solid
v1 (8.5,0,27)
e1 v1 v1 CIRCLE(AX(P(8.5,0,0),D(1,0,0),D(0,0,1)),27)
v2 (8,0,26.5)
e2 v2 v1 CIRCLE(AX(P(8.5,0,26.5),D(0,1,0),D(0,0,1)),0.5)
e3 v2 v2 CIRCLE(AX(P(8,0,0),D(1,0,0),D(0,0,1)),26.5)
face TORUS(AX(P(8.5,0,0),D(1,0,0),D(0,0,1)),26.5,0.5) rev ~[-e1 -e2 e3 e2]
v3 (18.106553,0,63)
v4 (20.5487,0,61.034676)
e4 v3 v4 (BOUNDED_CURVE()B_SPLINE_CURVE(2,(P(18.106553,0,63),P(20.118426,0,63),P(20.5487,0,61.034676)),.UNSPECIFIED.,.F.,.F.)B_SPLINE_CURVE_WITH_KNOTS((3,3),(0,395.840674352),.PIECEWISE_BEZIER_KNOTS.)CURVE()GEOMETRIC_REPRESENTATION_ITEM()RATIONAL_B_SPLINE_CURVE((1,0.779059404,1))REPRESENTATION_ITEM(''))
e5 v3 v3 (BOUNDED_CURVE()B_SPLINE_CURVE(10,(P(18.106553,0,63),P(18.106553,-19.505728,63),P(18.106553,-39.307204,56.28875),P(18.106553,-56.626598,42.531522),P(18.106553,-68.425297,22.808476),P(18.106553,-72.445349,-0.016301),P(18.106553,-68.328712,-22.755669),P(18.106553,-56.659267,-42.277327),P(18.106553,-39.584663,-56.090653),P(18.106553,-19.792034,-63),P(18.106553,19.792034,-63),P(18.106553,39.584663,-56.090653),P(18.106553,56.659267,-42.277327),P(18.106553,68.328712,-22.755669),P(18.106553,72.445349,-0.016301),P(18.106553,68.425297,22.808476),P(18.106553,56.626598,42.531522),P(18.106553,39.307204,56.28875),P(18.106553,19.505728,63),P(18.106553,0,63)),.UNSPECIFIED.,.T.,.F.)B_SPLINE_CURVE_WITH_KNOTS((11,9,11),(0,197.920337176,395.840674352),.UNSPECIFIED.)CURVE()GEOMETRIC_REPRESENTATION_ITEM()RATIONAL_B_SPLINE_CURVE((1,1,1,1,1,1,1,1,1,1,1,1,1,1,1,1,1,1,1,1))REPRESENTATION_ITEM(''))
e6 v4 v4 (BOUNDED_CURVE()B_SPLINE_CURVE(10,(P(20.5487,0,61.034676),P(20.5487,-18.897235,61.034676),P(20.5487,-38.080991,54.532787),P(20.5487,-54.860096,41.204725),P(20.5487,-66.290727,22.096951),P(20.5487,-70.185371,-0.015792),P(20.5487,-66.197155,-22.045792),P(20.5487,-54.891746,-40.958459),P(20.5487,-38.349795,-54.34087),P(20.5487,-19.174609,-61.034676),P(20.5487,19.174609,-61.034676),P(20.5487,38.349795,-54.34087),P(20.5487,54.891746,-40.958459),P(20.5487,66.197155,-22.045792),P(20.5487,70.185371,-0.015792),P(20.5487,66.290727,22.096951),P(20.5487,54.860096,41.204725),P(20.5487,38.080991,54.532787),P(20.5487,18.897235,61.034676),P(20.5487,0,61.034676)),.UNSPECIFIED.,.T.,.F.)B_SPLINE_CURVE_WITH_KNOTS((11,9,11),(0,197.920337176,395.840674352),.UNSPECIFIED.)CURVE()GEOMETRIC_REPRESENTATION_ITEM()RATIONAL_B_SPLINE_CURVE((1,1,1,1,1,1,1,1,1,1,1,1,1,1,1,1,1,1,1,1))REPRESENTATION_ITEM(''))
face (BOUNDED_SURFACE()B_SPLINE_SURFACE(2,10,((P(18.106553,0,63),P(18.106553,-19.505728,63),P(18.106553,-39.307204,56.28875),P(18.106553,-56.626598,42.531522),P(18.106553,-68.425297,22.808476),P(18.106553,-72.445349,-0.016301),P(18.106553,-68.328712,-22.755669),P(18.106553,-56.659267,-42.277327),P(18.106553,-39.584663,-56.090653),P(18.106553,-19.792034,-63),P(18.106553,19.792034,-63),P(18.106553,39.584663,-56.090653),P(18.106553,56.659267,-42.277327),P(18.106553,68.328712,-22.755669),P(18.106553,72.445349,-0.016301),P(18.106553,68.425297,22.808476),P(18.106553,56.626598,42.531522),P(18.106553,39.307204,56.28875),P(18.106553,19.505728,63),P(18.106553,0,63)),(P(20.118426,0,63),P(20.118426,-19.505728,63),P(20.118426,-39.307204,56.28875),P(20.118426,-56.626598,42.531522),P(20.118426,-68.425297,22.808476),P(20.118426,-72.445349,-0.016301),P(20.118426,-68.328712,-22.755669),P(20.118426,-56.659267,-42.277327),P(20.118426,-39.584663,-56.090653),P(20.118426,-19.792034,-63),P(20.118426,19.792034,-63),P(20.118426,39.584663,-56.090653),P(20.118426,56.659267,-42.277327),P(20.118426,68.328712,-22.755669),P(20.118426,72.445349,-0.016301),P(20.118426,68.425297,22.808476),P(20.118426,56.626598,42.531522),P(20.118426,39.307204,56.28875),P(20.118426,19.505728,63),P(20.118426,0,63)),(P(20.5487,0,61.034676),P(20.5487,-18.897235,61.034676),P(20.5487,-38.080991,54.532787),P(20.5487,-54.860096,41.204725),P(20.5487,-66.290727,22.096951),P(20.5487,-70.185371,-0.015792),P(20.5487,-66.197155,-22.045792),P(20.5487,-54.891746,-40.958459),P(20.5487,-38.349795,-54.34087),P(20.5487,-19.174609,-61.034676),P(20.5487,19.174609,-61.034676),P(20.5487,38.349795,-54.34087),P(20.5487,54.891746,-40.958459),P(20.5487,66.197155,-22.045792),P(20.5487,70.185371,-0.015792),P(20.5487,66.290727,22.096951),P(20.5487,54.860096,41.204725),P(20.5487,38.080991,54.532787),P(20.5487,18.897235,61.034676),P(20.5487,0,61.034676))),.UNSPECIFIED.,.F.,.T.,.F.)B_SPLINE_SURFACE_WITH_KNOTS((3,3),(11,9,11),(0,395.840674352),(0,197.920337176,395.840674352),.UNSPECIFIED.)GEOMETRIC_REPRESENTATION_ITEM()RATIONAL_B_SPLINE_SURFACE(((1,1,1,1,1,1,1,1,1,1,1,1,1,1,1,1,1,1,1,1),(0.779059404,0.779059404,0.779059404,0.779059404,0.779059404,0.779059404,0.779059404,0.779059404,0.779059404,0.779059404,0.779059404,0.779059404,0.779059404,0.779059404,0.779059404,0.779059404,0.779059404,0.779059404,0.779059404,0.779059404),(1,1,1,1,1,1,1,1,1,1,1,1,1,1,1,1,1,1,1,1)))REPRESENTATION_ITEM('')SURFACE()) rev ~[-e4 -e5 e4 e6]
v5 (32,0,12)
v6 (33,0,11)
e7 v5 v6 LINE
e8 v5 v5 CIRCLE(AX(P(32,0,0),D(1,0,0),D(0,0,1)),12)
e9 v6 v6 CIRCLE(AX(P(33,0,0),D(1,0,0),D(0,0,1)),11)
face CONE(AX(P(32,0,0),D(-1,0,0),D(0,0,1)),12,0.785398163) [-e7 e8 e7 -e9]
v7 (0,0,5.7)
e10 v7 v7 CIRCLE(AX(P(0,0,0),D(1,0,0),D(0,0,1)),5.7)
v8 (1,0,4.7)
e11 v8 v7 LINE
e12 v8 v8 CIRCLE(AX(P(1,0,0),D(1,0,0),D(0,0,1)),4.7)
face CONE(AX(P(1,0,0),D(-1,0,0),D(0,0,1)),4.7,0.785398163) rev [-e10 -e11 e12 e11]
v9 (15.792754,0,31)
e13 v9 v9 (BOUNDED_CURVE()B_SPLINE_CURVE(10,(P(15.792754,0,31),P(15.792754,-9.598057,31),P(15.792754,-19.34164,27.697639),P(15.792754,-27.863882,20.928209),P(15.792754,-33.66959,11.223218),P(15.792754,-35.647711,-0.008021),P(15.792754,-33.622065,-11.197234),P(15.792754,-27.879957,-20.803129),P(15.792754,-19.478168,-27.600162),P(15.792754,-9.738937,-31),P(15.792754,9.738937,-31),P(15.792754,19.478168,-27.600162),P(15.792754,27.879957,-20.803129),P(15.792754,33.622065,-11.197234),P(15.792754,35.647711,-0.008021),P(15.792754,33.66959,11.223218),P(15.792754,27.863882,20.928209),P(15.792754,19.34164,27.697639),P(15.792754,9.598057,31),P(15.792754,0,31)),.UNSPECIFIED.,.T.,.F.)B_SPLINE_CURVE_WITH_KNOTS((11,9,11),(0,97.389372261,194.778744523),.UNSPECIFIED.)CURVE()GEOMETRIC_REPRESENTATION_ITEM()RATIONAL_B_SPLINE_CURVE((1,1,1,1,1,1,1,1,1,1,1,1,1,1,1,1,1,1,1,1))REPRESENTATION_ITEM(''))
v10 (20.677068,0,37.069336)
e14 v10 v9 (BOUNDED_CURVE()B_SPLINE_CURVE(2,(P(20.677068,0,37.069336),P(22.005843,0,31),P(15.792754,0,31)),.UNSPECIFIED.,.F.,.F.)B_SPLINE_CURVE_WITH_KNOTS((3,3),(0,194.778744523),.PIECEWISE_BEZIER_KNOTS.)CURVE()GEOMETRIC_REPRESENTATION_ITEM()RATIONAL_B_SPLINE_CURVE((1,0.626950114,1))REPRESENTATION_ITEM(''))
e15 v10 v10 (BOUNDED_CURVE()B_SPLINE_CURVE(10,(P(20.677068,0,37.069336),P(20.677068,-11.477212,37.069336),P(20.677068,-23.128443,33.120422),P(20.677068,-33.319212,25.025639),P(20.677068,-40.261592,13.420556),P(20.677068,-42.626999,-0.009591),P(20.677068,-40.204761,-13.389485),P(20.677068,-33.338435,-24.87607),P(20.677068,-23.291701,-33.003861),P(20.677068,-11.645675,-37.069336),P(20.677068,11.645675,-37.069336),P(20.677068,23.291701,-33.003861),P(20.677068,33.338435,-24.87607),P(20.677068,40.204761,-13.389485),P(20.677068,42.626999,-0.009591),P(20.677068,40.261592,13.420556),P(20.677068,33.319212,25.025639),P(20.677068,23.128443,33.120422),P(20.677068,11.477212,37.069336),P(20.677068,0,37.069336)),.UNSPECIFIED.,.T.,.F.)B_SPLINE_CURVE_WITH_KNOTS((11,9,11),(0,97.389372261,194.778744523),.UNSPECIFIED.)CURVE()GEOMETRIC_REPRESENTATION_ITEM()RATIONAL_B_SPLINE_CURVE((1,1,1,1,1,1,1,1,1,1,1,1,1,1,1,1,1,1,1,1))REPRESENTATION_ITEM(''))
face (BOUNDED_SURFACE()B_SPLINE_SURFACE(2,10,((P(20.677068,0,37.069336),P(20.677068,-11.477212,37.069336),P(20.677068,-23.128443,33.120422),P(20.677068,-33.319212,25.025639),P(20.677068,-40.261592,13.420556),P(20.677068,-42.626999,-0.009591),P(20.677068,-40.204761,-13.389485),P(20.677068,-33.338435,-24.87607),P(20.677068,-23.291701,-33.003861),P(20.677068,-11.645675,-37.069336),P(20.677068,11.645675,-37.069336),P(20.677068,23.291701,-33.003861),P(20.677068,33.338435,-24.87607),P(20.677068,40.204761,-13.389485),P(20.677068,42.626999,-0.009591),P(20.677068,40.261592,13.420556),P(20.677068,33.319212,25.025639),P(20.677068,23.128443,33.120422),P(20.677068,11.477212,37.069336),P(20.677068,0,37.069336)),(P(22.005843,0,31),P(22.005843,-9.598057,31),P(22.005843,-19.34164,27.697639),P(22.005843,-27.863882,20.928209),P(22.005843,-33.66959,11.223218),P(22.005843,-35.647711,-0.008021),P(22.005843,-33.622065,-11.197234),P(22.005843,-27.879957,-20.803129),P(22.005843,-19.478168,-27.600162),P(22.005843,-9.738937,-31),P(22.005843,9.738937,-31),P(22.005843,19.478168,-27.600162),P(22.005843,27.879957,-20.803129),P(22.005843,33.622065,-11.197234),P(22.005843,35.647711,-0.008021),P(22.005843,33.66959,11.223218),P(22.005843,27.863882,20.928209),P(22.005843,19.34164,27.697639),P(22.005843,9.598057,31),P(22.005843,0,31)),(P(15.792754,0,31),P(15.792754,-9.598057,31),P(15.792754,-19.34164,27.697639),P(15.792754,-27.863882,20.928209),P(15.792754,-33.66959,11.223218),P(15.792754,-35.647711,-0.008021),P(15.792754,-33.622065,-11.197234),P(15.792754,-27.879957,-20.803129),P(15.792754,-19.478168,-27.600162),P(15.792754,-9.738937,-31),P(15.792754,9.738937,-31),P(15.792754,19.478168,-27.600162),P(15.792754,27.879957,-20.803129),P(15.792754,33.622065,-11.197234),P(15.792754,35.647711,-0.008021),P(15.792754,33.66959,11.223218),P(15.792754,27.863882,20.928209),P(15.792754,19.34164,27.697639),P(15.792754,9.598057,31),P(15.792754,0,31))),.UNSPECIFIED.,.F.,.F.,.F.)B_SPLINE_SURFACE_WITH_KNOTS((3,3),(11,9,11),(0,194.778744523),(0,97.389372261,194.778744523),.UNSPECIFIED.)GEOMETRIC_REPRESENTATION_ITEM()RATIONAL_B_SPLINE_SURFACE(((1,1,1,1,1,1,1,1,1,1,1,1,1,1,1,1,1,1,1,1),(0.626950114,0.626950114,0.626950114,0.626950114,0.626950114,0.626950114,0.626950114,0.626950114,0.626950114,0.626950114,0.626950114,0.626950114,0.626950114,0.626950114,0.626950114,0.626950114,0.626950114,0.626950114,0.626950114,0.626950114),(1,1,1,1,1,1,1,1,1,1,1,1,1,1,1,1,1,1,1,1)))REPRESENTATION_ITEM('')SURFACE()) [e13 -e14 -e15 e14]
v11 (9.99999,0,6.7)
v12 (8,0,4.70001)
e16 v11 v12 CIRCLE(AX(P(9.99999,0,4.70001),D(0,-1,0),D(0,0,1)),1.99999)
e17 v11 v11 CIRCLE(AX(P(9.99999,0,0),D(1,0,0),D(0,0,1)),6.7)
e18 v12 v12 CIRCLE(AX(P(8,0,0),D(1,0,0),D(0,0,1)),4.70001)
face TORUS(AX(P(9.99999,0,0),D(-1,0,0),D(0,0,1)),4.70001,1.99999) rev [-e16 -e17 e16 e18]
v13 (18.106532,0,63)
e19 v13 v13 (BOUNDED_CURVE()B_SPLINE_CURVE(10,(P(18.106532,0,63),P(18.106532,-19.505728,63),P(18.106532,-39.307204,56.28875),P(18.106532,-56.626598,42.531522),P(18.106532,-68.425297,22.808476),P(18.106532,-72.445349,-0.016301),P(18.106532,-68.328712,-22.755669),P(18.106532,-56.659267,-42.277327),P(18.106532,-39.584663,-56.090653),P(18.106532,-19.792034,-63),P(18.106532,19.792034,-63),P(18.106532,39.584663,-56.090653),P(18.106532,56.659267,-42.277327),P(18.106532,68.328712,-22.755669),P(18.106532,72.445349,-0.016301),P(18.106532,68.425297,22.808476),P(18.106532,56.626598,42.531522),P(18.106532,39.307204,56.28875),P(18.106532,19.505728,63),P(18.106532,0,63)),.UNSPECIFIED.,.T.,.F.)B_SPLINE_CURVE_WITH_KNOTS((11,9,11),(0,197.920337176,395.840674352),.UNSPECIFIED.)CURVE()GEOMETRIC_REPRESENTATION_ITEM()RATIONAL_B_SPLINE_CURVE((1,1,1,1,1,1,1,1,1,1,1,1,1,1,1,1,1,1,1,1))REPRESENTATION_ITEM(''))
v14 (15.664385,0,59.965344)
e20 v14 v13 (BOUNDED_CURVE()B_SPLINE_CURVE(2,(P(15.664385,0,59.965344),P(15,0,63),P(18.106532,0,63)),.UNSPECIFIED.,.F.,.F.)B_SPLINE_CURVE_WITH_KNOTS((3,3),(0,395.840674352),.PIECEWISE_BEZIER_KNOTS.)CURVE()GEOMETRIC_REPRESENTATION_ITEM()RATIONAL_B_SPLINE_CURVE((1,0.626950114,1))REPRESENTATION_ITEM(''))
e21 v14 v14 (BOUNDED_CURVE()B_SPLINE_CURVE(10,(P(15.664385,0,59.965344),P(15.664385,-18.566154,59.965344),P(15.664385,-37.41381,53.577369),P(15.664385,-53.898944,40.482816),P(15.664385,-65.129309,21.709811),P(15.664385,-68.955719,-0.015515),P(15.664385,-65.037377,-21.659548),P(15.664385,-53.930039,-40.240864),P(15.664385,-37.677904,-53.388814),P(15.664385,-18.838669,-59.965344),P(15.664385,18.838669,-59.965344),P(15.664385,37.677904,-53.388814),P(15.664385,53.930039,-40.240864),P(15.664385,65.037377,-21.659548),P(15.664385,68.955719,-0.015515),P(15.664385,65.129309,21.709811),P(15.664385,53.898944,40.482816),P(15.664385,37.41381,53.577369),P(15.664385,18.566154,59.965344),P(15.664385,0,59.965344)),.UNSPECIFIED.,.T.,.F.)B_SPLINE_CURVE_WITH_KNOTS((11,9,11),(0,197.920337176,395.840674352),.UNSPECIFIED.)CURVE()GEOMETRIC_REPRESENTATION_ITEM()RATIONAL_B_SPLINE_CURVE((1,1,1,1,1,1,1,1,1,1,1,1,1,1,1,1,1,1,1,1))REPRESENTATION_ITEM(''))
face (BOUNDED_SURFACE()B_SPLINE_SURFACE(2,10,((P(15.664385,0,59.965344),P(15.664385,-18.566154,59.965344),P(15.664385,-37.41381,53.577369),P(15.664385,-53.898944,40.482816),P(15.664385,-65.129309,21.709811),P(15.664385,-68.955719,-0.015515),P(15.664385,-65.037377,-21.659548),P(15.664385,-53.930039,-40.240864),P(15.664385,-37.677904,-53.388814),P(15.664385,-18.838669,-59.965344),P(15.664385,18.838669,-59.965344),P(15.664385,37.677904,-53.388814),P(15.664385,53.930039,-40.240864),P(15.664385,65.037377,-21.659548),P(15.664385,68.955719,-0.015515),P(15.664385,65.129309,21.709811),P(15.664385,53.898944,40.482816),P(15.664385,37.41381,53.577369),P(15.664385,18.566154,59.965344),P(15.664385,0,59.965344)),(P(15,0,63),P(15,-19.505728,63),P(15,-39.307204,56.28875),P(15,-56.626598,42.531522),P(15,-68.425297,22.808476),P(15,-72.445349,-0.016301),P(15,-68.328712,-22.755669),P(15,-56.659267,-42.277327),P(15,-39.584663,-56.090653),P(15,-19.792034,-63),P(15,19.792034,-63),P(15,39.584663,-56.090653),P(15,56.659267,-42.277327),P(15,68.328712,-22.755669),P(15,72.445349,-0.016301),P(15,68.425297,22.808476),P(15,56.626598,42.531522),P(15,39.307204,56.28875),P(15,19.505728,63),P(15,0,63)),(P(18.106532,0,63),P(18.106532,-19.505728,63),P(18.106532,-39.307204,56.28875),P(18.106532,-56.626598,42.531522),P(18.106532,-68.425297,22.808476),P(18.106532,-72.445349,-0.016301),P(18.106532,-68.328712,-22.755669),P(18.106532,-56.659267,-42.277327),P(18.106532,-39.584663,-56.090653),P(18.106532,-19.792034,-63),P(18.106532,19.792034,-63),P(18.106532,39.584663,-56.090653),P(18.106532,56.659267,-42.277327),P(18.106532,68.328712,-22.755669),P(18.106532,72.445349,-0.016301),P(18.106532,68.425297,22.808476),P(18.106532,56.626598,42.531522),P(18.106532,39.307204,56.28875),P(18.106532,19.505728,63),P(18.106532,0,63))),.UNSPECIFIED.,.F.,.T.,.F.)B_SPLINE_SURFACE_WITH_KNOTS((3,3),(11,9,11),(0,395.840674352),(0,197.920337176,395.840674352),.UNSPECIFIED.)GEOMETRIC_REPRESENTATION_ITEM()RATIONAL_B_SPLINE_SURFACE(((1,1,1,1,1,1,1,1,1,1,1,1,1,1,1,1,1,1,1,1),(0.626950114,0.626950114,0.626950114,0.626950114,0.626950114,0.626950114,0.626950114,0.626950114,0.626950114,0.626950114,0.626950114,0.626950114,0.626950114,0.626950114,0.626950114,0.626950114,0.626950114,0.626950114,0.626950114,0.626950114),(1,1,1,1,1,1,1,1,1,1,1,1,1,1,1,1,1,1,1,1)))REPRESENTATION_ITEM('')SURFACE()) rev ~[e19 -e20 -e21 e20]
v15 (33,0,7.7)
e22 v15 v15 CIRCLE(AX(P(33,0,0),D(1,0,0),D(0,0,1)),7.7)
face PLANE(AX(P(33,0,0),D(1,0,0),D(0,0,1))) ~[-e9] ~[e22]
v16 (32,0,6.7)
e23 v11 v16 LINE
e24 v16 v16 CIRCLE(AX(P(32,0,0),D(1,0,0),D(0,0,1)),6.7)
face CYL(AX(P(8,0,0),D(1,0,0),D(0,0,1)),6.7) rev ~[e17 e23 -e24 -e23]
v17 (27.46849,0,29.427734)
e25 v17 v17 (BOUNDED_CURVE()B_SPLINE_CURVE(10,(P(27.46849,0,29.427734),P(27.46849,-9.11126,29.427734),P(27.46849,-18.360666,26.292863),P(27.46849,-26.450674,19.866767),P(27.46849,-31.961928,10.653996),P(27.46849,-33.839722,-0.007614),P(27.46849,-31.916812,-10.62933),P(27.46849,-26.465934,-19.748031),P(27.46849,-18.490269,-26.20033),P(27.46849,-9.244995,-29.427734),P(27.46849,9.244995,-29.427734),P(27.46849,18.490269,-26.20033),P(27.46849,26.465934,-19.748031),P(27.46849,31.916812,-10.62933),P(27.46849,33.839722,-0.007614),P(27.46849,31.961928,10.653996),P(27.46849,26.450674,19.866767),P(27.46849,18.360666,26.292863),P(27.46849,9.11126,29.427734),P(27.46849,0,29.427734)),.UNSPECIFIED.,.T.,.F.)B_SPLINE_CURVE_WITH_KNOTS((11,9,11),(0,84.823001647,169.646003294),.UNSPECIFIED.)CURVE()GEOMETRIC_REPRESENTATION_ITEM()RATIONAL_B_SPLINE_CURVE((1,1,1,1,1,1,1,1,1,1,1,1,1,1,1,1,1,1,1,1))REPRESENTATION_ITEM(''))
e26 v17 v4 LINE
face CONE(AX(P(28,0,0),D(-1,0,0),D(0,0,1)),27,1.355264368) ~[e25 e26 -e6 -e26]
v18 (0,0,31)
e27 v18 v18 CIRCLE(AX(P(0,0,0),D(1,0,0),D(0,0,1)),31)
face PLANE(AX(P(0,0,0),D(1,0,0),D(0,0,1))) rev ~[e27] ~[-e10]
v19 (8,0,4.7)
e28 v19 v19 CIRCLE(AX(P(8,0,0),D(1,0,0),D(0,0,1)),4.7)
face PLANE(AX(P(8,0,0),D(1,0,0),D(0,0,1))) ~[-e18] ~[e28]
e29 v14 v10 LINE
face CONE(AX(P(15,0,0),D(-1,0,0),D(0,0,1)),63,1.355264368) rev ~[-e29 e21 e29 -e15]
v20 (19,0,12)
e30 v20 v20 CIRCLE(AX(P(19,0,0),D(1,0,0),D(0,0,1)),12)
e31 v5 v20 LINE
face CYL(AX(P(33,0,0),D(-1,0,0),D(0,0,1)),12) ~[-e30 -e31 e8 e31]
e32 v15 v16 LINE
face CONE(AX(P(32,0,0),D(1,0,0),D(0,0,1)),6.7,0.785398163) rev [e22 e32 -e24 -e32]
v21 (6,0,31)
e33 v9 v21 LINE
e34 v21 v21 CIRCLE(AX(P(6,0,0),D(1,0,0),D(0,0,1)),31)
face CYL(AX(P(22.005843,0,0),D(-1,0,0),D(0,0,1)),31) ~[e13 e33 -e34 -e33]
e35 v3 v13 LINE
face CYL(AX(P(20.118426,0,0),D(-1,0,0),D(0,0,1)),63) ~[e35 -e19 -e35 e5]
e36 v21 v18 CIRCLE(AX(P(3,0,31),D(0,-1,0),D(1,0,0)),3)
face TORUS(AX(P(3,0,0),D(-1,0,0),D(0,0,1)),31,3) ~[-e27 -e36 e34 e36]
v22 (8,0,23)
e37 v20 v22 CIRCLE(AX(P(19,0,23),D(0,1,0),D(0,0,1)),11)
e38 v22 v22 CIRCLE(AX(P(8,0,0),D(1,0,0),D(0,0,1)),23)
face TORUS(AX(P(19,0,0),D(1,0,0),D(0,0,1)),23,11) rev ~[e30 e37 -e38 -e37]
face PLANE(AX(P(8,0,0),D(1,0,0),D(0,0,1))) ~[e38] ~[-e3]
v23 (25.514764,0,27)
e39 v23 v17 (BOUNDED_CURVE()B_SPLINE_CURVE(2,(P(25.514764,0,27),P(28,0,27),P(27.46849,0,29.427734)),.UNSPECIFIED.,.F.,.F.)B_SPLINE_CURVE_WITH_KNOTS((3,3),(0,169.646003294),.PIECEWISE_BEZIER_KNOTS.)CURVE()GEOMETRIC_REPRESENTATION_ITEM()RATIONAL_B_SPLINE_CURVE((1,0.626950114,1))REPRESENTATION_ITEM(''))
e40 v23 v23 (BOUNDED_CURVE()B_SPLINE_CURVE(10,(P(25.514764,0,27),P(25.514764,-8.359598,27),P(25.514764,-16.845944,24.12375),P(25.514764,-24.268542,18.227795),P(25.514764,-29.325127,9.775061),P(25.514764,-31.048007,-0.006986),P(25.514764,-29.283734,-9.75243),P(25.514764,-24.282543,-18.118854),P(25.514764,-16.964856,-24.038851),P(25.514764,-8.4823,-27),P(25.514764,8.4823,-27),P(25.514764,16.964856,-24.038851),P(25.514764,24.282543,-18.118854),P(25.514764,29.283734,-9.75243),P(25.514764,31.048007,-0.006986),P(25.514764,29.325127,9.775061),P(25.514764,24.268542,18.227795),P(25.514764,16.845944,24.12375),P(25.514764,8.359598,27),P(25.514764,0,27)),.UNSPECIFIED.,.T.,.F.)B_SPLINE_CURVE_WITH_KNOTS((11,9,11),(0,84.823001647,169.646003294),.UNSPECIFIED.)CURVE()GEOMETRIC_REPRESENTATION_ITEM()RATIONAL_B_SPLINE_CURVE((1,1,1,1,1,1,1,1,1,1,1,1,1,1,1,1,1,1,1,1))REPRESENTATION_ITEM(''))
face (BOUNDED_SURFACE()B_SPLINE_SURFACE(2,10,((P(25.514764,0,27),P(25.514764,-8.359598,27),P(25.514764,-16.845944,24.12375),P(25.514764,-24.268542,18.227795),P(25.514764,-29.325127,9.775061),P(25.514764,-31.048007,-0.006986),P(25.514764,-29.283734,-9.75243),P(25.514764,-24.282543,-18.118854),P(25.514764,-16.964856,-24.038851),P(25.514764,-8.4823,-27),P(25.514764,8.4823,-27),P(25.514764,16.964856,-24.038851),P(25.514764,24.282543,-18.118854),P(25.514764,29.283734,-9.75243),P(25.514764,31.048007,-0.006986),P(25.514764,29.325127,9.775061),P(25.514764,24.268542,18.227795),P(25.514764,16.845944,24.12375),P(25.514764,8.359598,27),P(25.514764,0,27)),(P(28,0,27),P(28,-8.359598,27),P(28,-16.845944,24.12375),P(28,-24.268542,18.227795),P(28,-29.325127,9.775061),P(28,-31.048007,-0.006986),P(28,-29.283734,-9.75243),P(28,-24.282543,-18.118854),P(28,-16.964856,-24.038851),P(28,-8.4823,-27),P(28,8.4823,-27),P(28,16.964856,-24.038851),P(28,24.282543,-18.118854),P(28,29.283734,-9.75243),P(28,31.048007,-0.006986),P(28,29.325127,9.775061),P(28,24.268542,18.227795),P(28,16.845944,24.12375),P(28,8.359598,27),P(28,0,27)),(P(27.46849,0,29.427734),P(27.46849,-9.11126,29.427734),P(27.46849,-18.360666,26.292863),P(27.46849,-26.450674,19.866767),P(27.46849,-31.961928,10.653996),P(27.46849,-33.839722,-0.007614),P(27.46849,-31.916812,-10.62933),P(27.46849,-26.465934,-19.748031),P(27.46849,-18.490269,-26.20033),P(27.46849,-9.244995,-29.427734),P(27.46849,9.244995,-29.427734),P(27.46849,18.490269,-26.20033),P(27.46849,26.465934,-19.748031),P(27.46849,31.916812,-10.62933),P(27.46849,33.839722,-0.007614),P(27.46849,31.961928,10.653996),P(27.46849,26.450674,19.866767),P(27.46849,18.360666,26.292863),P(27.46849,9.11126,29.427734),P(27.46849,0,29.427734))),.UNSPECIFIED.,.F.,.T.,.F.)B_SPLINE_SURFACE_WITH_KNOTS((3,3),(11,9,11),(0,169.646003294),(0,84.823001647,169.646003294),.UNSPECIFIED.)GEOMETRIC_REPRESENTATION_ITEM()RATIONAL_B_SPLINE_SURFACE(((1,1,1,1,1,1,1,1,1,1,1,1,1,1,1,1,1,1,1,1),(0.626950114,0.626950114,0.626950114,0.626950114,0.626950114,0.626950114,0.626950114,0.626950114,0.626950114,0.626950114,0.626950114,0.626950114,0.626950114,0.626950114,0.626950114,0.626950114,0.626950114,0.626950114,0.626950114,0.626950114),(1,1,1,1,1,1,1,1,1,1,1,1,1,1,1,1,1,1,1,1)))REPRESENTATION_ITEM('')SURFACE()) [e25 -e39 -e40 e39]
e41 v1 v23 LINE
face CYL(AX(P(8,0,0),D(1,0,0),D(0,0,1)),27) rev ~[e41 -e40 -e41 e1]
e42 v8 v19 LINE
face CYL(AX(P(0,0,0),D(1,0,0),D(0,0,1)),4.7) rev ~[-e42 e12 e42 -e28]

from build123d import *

# Parameters (mm, degrees)
F2_R    = 0.5
F3_R    = 2
F4_SIZE = 1
F5_R    = 11
F6_R    = 1.99999
F7_SIZE = 1
F8_R    = 2.49999
F9_R    = 5


# Not quite as in the source:
# - a fillet or chamfer is up to 0.001 mm smaller than in the source, because OpenCascade refuses the exact size


with BuildPart() as f1:
    # F0 (on Front) → F1 (revolve)
    with BuildSketch(Plane.XZ):
        with BuildLine():
            Line((0, 31), (0, 4.7))
            Line((0, 4.7), (8, 4.7))
            Line((8, 4.7), (8, 6.7))
            Line((8, 6.7), (33, 6.7))
            Line((33, 6.7), (33, 12))
            Line((33, 12), (8, 12))
            Line((8, 12), (8, 27))
            Line((8, 27), (28, 27))
            Line((28, 27), (20.118426236, 63))
            Line((20.118426236, 63), (15, 63))
            Line((15, 63), (22.0058433458, 31))
            Line((22.0058433458, 31), (6, 31))
            ThreePointArc((6, 31), (3, 34), (0, 31))
        make_face()
    revolve(axis=Axis((1.1409256999, 0, 0), (1, 0, 0)))

    # F2
    f2_edges = [f1.edges().sort_by_distance(p)[0] for p in [
        (8, 0, -27),
    ]]
    fillet(f2_edges, radius=F2_R)

    # F3
    f3_edges = [f1.edges().sort_by_distance(p)[0] for p in [
        (28, 0, -27),
    ]]
    fillet(f3_edges, radius=F3_R)

    # F4
    f4_edges = [f1.edges().sort_by_distance(p)[0] for p in [
        (33, 0, -6.7),
        (33, 0, -12),
    ]]
    chamfer(f4_edges, length=F4_SIZE)

    # F5
    f5_edges = [f1.edges().sort_by_distance(p)[0] for p in [
        (8, 0, -12),
    ]]
    fillet(f5_edges, radius=F5_R)

    # F6 (radius 2 in the source; OpenCascade refuses exactly that, so slightly less here)
    f6_edges = [f1.edges().sort_by_distance(p)[0] for p in [
        (8, 0, -6.7),
    ]]
    fillet(f6_edges, radius=F6_R)

    # F7
    f7_edges = [f1.edges().sort_by_distance(p)[0] for p in [
        (0, 0, -4.7),
    ]]
    chamfer(f7_edges, length=F7_SIZE)

    # F8 (radius 2.5 in the source; OpenCascade refuses exactly that, so slightly less here)
    f8_edges = [f1.edges().sort_by_distance(p)[0] for p in [
        (15, 0, -63),
        (20.118426, 0, -63),
    ]]
    fillet(f8_edges, radius=F8_R)

    # F9
    f9_edges = [f1.edges().sort_by_distance(p)[0] for p in [
        (22.005843, 0, -31),
    ]]
    fillet(f9_edges, radius=F9_R)


solid = f1.part
